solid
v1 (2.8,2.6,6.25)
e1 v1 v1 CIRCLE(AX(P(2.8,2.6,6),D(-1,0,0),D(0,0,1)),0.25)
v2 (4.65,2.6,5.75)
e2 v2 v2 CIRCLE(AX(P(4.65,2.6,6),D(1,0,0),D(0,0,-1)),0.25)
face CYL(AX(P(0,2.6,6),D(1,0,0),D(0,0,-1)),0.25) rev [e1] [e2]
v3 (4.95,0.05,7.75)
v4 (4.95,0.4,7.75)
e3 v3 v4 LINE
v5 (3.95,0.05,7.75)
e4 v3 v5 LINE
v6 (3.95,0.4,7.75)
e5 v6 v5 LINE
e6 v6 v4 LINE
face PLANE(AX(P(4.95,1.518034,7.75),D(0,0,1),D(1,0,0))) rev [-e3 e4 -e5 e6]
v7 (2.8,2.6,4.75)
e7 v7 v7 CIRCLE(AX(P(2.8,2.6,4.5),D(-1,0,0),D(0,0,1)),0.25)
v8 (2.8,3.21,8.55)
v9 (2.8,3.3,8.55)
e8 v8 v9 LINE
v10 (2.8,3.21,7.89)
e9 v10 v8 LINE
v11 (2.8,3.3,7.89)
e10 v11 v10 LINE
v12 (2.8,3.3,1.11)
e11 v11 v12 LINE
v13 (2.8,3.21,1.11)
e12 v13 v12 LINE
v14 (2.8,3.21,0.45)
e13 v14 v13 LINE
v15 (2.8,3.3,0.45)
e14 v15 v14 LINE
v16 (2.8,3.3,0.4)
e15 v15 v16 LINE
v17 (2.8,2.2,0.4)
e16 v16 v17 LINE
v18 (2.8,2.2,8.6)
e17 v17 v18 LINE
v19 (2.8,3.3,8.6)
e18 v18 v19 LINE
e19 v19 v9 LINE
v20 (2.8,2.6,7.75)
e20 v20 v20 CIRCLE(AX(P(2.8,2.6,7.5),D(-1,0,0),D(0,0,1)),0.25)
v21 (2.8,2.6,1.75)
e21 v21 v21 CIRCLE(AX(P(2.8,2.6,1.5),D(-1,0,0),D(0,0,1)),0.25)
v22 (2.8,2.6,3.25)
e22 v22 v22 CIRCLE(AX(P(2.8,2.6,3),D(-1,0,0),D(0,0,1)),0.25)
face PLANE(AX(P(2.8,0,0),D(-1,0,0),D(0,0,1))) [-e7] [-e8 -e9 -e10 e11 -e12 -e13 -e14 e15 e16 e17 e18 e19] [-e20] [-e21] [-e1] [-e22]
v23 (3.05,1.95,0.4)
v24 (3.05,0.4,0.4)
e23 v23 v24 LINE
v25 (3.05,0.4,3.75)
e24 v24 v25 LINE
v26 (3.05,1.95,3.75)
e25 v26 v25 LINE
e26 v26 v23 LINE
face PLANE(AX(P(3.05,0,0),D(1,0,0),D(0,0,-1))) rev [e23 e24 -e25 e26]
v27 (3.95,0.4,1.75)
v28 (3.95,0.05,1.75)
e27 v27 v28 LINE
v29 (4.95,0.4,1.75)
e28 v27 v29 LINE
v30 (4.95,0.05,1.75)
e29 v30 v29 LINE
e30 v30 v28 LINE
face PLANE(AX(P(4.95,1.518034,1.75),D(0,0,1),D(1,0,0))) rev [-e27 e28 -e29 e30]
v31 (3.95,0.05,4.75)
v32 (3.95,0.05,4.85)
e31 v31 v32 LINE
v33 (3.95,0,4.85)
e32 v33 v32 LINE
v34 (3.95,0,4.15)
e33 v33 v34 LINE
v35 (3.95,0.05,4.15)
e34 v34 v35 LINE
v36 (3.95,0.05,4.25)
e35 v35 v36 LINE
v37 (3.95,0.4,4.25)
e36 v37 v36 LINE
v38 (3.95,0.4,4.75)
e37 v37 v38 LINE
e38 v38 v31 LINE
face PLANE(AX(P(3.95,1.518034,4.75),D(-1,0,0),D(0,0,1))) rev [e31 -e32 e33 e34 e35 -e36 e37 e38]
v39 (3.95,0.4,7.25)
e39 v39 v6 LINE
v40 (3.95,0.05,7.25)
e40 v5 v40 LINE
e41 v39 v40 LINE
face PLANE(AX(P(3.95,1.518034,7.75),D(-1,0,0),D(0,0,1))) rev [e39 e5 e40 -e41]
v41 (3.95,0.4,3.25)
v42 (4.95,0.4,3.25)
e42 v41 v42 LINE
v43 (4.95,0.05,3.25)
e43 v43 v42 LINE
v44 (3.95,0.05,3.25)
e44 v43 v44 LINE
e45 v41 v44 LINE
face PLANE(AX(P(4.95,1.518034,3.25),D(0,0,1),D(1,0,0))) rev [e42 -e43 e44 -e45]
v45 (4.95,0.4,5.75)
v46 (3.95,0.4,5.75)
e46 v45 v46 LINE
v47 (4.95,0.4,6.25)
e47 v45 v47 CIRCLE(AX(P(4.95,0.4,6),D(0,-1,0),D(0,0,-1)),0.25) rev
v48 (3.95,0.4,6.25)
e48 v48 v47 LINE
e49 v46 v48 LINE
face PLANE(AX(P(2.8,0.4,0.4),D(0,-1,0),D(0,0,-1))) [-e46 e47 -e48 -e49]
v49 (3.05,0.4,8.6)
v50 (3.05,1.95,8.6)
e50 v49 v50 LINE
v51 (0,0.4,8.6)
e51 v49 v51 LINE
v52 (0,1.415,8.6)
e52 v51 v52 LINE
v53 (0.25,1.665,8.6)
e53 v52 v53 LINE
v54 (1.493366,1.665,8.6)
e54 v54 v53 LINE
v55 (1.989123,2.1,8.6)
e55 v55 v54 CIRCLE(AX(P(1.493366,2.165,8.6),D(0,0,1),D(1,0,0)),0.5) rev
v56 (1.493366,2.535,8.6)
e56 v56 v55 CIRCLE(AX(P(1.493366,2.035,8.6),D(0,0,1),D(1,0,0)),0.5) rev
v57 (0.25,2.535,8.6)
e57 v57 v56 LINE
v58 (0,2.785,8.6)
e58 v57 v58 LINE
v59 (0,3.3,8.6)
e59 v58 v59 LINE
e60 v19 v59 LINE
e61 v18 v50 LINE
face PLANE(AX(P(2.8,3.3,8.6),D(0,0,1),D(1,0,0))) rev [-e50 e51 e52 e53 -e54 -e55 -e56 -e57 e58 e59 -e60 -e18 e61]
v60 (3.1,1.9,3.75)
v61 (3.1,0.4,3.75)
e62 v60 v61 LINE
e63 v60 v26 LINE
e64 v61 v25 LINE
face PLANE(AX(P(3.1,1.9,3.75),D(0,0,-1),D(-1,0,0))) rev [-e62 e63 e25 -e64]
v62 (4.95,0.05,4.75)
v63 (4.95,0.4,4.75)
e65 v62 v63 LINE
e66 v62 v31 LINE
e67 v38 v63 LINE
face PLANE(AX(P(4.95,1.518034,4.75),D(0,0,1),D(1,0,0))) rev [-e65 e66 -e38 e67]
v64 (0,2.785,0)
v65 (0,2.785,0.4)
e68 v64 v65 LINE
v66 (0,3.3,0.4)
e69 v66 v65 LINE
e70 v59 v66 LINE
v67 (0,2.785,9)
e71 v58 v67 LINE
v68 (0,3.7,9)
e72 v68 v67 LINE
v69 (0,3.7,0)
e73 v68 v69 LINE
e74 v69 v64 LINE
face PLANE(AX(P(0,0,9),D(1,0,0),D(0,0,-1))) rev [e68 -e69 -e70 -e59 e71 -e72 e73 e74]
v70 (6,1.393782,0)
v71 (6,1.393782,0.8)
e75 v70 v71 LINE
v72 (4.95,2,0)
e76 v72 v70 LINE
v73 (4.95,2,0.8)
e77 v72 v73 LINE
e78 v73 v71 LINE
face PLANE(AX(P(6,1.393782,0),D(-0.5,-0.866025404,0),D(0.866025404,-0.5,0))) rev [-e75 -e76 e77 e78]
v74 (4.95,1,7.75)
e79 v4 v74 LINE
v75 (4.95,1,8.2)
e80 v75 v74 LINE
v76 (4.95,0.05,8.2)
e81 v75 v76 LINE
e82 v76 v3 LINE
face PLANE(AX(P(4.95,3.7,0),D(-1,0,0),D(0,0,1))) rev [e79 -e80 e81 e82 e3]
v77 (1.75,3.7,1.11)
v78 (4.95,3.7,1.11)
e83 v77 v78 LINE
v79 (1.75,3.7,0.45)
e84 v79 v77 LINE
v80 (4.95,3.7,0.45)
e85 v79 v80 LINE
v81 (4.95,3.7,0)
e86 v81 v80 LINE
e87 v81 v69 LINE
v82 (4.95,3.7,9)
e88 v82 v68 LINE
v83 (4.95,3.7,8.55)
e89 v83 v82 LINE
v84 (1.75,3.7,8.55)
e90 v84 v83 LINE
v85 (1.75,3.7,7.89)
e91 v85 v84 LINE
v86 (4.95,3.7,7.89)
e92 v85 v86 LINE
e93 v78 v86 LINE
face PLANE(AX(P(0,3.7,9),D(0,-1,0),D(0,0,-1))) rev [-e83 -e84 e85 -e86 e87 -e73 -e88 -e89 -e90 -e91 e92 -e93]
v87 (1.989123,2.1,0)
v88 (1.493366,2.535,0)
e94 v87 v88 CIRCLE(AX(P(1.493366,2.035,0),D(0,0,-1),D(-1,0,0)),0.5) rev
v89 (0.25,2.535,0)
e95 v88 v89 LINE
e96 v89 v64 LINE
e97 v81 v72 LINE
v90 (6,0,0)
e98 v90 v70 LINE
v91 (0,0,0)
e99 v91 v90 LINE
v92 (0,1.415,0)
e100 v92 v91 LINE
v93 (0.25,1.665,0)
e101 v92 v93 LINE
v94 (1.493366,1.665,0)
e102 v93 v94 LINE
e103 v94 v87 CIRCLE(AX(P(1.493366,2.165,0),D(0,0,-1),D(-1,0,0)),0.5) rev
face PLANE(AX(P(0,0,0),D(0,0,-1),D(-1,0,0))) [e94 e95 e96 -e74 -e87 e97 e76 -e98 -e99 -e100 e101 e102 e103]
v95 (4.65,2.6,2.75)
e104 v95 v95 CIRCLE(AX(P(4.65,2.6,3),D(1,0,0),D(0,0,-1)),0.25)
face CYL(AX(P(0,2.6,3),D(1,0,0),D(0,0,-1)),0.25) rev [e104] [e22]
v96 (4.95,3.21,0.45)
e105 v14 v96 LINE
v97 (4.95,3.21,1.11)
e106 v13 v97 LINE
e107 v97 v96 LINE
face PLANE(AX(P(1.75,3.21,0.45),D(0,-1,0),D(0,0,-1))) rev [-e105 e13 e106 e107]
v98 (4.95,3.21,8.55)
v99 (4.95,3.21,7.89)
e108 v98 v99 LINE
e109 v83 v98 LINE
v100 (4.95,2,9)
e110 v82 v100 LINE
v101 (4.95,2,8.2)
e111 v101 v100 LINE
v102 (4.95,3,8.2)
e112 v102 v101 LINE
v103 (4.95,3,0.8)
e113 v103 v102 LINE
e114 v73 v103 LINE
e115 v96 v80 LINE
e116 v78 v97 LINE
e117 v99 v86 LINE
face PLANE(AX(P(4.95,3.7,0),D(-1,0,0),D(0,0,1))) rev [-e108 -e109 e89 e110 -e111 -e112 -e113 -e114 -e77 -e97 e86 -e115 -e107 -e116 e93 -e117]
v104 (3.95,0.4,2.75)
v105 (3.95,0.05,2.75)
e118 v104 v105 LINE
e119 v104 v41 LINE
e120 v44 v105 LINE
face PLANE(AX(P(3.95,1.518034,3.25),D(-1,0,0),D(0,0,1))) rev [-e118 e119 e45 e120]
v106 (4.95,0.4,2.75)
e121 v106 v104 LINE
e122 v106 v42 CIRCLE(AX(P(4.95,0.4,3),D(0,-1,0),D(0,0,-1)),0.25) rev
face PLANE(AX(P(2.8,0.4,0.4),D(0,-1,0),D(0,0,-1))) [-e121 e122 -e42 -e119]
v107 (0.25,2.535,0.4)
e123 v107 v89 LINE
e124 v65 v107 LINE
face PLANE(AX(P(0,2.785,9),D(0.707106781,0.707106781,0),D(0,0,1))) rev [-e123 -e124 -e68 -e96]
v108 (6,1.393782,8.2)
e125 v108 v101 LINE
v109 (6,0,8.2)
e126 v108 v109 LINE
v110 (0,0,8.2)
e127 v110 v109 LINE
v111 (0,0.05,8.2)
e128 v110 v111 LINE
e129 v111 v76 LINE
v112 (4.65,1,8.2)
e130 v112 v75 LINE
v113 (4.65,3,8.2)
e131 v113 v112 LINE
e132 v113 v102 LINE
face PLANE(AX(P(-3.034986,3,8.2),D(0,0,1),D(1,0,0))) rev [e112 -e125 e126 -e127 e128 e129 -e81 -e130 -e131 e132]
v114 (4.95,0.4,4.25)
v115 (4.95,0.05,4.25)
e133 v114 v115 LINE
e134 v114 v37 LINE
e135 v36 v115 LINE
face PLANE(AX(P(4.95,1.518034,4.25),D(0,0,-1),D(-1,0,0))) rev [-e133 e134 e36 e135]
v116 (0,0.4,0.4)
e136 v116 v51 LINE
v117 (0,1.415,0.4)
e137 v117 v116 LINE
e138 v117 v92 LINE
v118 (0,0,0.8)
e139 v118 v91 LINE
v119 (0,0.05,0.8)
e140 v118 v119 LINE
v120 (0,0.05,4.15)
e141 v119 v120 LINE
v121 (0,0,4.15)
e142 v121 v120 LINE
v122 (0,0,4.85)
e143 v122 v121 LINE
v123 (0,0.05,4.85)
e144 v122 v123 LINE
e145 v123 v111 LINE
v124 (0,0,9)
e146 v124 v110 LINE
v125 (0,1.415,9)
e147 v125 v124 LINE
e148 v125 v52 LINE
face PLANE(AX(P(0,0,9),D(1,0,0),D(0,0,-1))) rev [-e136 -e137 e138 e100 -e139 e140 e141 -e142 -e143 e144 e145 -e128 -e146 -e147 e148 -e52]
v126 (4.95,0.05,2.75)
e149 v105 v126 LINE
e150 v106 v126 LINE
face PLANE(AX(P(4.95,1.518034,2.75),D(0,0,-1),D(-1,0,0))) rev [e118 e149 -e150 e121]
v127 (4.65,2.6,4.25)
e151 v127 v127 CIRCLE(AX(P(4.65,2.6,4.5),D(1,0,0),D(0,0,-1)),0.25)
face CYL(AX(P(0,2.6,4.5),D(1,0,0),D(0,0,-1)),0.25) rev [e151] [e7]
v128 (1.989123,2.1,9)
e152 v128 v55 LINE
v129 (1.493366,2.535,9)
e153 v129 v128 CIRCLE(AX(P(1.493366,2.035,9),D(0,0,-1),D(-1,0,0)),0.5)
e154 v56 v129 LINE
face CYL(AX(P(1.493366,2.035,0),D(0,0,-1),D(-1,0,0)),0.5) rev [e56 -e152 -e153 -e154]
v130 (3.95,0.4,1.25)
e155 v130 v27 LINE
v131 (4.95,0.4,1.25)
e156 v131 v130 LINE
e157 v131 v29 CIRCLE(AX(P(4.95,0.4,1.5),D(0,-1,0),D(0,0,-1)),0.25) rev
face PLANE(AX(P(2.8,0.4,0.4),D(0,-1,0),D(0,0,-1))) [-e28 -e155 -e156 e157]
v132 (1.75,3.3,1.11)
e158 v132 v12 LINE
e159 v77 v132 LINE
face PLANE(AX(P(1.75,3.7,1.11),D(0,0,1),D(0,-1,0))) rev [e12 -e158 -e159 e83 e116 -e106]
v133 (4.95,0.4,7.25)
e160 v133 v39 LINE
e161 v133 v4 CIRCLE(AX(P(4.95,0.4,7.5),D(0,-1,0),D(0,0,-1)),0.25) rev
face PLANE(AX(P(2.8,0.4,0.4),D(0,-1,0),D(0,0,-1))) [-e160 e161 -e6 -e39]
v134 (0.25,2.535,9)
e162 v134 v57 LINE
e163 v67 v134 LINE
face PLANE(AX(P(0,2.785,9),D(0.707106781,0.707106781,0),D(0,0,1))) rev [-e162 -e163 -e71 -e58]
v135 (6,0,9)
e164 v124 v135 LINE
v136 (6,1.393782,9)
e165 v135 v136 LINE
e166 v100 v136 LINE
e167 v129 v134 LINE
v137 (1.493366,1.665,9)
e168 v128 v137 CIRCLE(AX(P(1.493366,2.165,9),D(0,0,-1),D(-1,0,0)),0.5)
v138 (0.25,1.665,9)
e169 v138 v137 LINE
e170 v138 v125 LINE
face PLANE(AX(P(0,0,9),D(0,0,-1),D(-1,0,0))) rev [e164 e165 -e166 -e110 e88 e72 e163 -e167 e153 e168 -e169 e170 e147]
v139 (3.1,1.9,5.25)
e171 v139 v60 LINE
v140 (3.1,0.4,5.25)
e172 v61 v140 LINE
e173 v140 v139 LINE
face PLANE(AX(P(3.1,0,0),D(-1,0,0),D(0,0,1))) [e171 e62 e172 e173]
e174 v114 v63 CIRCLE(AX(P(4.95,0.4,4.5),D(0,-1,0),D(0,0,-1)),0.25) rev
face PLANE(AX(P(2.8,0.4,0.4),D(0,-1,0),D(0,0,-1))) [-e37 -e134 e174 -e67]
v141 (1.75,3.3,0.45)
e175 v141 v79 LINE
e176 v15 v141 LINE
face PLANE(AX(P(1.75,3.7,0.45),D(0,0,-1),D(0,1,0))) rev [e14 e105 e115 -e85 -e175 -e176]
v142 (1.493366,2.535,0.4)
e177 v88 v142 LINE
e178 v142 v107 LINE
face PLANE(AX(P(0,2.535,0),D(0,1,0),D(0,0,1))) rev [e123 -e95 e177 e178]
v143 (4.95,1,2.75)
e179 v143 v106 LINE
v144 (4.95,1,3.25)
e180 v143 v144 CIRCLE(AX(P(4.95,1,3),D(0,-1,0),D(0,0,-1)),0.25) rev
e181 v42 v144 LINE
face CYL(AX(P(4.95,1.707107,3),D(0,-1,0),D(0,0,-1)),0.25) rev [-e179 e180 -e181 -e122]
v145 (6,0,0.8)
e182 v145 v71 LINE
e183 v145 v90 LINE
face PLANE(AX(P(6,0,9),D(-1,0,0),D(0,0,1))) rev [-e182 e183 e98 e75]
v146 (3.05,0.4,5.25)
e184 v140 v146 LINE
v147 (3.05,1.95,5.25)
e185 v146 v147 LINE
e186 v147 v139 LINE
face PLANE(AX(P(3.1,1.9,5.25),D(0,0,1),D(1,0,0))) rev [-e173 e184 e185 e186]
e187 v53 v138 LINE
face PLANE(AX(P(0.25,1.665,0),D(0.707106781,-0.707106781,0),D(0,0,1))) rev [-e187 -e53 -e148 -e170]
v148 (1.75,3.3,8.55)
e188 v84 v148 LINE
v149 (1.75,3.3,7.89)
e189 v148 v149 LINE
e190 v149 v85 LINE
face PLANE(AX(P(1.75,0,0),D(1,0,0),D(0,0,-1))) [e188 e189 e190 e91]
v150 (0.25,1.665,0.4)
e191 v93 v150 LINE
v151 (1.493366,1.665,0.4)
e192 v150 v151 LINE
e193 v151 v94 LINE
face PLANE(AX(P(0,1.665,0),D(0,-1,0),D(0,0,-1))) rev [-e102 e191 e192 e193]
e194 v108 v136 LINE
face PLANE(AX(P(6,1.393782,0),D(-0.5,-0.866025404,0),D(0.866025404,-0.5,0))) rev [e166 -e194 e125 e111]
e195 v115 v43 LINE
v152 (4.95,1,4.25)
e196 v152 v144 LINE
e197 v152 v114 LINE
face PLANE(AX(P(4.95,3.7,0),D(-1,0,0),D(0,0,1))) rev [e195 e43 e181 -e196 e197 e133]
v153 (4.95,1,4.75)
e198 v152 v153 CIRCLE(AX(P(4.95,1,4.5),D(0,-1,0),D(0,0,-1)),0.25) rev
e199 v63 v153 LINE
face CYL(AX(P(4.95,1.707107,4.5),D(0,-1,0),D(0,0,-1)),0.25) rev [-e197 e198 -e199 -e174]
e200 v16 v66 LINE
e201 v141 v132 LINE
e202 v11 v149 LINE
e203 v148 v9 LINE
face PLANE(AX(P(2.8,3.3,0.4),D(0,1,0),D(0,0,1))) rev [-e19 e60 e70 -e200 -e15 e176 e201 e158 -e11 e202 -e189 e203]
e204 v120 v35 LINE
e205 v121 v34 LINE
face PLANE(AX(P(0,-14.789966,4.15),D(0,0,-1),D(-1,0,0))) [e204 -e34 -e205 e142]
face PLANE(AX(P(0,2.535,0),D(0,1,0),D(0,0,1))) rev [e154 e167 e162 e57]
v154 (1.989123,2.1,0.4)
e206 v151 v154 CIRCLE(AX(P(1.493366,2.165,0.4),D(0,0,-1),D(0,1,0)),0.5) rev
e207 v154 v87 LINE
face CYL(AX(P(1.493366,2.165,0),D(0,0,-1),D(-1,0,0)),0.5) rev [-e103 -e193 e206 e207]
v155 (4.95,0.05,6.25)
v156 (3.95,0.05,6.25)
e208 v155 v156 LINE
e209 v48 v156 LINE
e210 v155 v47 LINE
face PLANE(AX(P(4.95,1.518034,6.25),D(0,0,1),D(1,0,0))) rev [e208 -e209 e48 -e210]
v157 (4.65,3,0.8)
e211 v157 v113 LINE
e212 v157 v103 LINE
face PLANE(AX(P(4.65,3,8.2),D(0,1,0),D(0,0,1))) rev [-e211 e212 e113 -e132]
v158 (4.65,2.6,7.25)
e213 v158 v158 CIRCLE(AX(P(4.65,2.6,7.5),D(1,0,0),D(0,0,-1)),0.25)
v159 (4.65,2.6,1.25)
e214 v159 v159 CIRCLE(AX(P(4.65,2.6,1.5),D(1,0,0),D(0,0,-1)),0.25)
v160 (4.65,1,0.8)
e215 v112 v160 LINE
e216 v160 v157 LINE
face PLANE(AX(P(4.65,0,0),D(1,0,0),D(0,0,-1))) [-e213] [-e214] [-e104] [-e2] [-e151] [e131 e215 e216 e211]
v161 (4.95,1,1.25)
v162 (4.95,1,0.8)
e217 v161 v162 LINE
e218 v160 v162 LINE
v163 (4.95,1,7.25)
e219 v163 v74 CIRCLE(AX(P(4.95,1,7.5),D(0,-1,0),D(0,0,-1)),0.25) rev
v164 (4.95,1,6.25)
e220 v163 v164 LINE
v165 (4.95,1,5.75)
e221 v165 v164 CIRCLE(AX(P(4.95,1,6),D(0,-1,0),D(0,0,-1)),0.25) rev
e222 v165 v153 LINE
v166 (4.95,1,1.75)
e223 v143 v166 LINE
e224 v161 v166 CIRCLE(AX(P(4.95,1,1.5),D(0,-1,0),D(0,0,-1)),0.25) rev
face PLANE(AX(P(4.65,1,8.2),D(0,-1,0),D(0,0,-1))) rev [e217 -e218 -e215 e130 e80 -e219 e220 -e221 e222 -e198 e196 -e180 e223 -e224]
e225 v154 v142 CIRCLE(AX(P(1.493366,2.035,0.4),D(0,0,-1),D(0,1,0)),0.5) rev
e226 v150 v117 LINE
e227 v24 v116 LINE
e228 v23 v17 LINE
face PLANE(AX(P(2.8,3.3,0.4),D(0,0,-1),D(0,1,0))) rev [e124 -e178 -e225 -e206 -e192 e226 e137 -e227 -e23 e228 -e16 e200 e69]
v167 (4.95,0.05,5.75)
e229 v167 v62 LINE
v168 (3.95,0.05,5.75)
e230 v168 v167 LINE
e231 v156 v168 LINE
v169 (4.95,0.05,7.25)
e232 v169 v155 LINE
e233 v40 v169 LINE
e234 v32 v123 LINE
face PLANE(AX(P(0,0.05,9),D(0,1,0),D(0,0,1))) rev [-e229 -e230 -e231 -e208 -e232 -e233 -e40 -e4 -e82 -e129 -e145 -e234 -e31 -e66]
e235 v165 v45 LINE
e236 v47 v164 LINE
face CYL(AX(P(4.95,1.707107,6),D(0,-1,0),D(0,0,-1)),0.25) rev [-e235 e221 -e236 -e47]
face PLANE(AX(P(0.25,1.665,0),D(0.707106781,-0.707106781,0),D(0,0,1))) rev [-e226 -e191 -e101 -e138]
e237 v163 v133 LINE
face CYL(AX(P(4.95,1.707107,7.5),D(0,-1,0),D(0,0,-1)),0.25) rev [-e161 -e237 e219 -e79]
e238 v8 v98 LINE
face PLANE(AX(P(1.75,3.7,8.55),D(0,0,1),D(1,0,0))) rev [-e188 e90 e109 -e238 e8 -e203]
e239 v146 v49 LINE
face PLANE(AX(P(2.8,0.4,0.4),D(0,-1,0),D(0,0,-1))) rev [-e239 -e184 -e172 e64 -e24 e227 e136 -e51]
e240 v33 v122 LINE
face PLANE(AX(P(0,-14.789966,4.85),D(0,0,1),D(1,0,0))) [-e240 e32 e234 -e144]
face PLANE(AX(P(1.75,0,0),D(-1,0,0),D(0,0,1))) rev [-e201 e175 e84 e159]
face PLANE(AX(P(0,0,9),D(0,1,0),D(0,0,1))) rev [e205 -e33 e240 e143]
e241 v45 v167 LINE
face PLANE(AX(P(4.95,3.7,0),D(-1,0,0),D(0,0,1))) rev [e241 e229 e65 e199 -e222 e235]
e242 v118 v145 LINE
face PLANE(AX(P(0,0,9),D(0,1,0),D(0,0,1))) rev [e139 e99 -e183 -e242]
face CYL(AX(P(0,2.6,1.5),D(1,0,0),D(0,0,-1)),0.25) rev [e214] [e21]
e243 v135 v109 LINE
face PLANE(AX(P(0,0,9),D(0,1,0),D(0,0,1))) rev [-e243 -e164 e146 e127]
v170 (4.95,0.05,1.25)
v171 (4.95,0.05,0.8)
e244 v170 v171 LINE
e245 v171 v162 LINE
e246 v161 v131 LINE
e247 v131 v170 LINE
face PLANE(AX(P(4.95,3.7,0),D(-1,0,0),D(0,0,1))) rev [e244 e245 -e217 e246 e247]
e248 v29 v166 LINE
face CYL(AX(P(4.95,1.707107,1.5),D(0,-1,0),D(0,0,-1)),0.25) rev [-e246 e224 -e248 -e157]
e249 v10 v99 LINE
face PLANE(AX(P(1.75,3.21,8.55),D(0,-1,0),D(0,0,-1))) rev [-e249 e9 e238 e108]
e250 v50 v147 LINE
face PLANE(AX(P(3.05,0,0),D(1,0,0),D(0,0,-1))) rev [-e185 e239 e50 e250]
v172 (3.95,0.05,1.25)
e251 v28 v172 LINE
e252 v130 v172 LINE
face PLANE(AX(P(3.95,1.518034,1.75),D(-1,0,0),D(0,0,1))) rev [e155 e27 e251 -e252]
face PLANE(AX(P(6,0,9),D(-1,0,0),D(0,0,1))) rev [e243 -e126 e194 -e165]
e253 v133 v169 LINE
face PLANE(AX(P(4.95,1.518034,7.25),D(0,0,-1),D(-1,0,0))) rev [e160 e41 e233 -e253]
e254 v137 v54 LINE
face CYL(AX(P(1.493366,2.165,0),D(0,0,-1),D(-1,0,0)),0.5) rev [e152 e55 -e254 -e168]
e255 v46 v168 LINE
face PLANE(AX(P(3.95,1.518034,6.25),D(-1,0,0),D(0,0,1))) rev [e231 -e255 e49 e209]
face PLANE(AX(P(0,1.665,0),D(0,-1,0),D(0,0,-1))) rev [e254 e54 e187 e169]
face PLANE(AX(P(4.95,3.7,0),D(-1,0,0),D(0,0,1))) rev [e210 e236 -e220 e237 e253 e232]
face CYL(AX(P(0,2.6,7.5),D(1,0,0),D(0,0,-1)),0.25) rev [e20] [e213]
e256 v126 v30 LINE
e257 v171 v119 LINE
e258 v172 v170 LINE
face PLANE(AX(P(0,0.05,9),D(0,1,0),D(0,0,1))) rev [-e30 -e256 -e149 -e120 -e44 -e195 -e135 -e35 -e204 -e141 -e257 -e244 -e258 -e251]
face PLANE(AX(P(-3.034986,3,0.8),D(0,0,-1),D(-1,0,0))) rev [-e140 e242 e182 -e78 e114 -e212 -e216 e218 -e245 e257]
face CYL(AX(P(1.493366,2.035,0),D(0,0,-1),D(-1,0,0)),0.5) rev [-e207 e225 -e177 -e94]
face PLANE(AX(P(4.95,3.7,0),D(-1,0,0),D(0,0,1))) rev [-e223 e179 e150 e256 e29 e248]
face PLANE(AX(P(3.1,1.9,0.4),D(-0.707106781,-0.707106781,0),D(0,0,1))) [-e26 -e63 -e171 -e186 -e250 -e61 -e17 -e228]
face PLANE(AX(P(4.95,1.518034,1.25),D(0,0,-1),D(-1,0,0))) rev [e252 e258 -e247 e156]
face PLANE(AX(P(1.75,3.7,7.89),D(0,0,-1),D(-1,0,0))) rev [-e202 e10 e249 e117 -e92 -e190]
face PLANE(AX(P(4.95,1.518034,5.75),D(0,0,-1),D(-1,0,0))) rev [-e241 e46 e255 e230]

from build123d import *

# Parameters (mm, degrees)
SKETCH_1_W               = 6
SKETCH_1_H               = 3.7
EXTRUDE_1_DEPTH          = 9
SKETCH_2_W               = 1.993366308
SKETCH_2_H               = 0.87
CUT_EXTRUDE_1_DEPTH      = 12.431972708
CHAMFER_1_SIZE           = 0.25
FILLET_1_R               = 0.5
SKETCH_3_W               = 8.2
SKETCH_3_H               = 2.9
CUT_EXTRUDE_2_DEPTH      = 2.8
SKETCH_4_W               = 7.4
SKETCH_4_H               = 3
CUT_EXTRUDE_3_DEPTH      = 1.05
SKETCH_5_W               = 7.4
SKETCH_5_H               = 2
CUT_EXTRUDE_4_DEPTH      = 0.3
SKETCH_6_R               = 0.25
CUT_EXTRUDE_5_DEPTH      = 1
SKETCH_7_R               = 0.25
CUT_EXTRUDE_6_DEPTH      = 11.784827305
SKETCH_8_W               = 1
SKETCH_8_H               = 0.5
CUT_EXTRUDE_7_DEPTH      = 0.4
CUT_EXTRUDE_8_DEPTH      = 12.431972708
CUT_EXTRUDE_8_DEPTH_BACK = 0.05
SKETCH_10_W              = 0.66
SKETCH_10_H              = 0.49
CUT_EXTRUDE_9_DEPTH      = 3.2
SKETCH_11_W              = 8.2
SKETCH_11_H              = 1.5
CUT_EXTRUDE_10_DEPTH     = 0.25
SKETCH_12_W              = 1.5
SKETCH_12_H              = 1.5
CUT_EXTRUDE_11_DEPTH     = 0.05
CHAMFER_2_SIZE           = 0.3


# Some blends are built 0.0001 mm under size
with BuildPart() as part:
    # 스케치1 → 보스-돌출1 (new body)
    with BuildSketch(Plane.XY):
        with Locations((3, 1.85)):
            Rectangle(SKETCH_1_W, SKETCH_1_H)
    extrude(amount=EXTRUDE_1_DEPTH)

    # 스케치2 → 컷-돌출1 (cut, through all)
    with BuildSketch(Plane.XY.offset(9)):
        Polygon((6, 3.7), (4.95, 3.7), (4.95, 2), (6, 1.393782217), align=None)
        with Locations((0.996683154, 2.1)):
            Rectangle(SKETCH_2_W, SKETCH_2_H)
    extrude(amount=-CUT_EXTRUDE_1_DEPTH, mode=Mode.SUBTRACT)

    # 모따기1
    chamfer_1_edges = [part.edges().sort_by_distance(p)[0] for p in [
        (0, 1.665, 4.5),
        (0, 2.535, 4.5),
    ]]
    chamfer(chamfer_1_edges, length=CHAMFER_1_SIZE)

    # 필렛1
    # the kernel refuses this fillet: 0.5 mm, written as the material it adds along each edge
    with BuildSketch(Plane(origin=(1.993366308, 1.665, 9), x_dir=(-1, 0, 0), z_dir=(0, 0, -1)), Plane(origin=(1.993366308, 2.535, 9), x_dir=(0, -1, 0), z_dir=(0, 0, -1))) as fillet_1_piece_1:
        with BuildLine():
            CenterArc((FILLET_1_R, FILLET_1_R), FILLET_1_R, 180, 90)
            Line((0, FILLET_1_R), (0, 0))
            Line((0, 0), (FILLET_1_R, 0))
        make_face()
    extrude(amount=9)

    # 스케치3 → 컷-돌출2 (cut)
    with BuildSketch(Plane.ZY):
        with Locations((4.5, 1.85)):
            Rectangle(SKETCH_3_W, SKETCH_3_H)
    extrude(amount=-CUT_EXTRUDE_2_DEPTH, mode=Mode.SUBTRACT)

    # 스케치4 → 컷-돌출3 (cut)
    with BuildSketch(Plane(origin=(6, 0, 0), x_dir=(0, 0, -1), z_dir=(1, 0, 0))):
        with Locations((-4.5, 1.5)):
            Rectangle(SKETCH_4_W, SKETCH_4_H)
    extrude(amount=-CUT_EXTRUDE_3_DEPTH, mode=Mode.SUBTRACT)

    # 스케치5 → 컷-돌출4 (cut)
    with BuildSketch(Plane(origin=(4.95, 0, 0), x_dir=(0, 0, -1), z_dir=(1, 0, 0))):
        with Locations((-4.5, 2)):
            Rectangle(SKETCH_5_W, SKETCH_5_H)
    extrude(amount=-CUT_EXTRUDE_4_DEPTH, mode=Mode.SUBTRACT)

    # 스케치6 → 컷-돌출5 (cut)
    with BuildSketch(Plane.XZ):
        with Locations((4.95, 4.5)):
            Circle(SKETCH_6_R)
        with Locations((4.95, 6)):
            Circle(SKETCH_6_R)
        with Locations((4.95, 3)):
            Circle(SKETCH_6_R)
        with Locations((4.95, 7.5)):
            Circle(SKETCH_6_R)
        with Locations((4.95, 1.5)):
            Circle(SKETCH_6_R)
    extrude(amount=-CUT_EXTRUDE_5_DEPTH, mode=Mode.SUBTRACT)

    # 스케치7 → 컷-돌출6 (cut, through all)
    with BuildSketch(Plane(origin=(4.65, 0, 0), x_dir=(0, 0, -1), z_dir=(1, 0, 0))):
        with Locations((-7.5, 2.6)):
            Circle(SKETCH_7_R)
        with Locations((-6, 2.6)):
            Circle(SKETCH_7_R)
        with Locations((-4.5, 2.6)):
            Circle(SKETCH_7_R)
        with Locations((-3, 2.6)):
            Circle(SKETCH_7_R)
        with Locations((-1.5, 2.6)):
            Circle(SKETCH_7_R)
    extrude(amount=-CUT_EXTRUDE_6_DEPTH, mode=Mode.SUBTRACT)

    # 스케치8 → 컷-돌출7 (cut)
    with BuildSketch(Plane.XZ):
        with Locations((4.45, 7.5)):
            Rectangle(SKETCH_8_W, SKETCH_8_H)
        with Locations((4.45, 6)):
            Rectangle(SKETCH_8_W, SKETCH_8_H)
        with Locations((4.45, 4.5)):
            Rectangle(SKETCH_8_W, SKETCH_8_H)
        with Locations((4.45, 3)):
            Rectangle(SKETCH_8_W, SKETCH_8_H)
        with Locations((4.45, 1.5)):
            Rectangle(SKETCH_8_W, SKETCH_8_H)
    extrude(amount=-CUT_EXTRUDE_7_DEPTH, mode=Mode.SUBTRACT)

    # 스케치9 → 컷-돌출8 (cut, two sides: drawn at the far end of the back side and taken through both)
    with BuildSketch(Plane.XZ.offset(-CUT_EXTRUDE_8_DEPTH_BACK)):
        Polygon((4.95, 8.2), (0, 8.2), (0, 4.85), (3.95, 4.85), (3.95, 4.75), (4.95, 4.75), (4.95, 5.75), (3.95, 5.75), (3.95, 6.25), (4.95, 6.25), (4.95, 7.25), (3.95, 7.25), (3.95, 7.75), (4.95, 7.75), align=None)
        Polygon((3.95, 4.15), (0, 4.15), (0, 0.8), (4.95, 0.8), (4.95, 1.25), (3.95, 1.25), (3.95, 1.75), (4.95, 1.75), (4.95, 2.75), (3.95, 2.75), (3.95, 3.25), (4.95, 3.25), (4.95, 4.25), (3.95, 4.25), align=None)
    extrude(amount=CUT_EXTRUDE_8_DEPTH + CUT_EXTRUDE_8_DEPTH_BACK, mode=Mode.SUBTRACT)

    # 스케치10 → 컷-돌출9 (cut)
    with BuildSketch(Plane(origin=(4.95, 0, 0), x_dir=(0, 0, -1), z_dir=(1, 0, 0))):
        with Locations((-8.22, 3.455)):
            Rectangle(SKETCH_10_W, SKETCH_10_H)
        with Locations((-0.78, 3.455)):
            Rectangle(SKETCH_10_W, SKETCH_10_H)
    extrude(amount=-CUT_EXTRUDE_9_DEPTH, mode=Mode.SUBTRACT)

    # 스케치11 → 컷-돌출10 (cut)
    with BuildSketch(Plane.ZY.offset(-2.8)):
        with Locations((4.5, 1.15)):
            Rectangle(SKETCH_11_W, SKETCH_11_H)
    extrude(amount=-CUT_EXTRUDE_10_DEPTH, mode=Mode.SUBTRACT)

    # 스케치12 → 컷-돌출11 (cut)
    with BuildSketch(Plane.ZY.offset(-3.05)):
        with Locations((4.5, 1.15)):
            Rectangle(SKETCH_12_W, SKETCH_12_H)
    extrude(amount=-CUT_EXTRUDE_11_DEPTH, mode=Mode.SUBTRACT)

    # 모따기2
    chamfer_2_edges = [part.edges().sort_by_distance(p)[0] for p in [
        (2.8, 1.9, 4.5),
    ]]
    chamfer(chamfer_2_edges, length=CHAMFER_2_SIZE - 0.0001)  # a hair under: the kernel refuses the full size


solid = part.part
